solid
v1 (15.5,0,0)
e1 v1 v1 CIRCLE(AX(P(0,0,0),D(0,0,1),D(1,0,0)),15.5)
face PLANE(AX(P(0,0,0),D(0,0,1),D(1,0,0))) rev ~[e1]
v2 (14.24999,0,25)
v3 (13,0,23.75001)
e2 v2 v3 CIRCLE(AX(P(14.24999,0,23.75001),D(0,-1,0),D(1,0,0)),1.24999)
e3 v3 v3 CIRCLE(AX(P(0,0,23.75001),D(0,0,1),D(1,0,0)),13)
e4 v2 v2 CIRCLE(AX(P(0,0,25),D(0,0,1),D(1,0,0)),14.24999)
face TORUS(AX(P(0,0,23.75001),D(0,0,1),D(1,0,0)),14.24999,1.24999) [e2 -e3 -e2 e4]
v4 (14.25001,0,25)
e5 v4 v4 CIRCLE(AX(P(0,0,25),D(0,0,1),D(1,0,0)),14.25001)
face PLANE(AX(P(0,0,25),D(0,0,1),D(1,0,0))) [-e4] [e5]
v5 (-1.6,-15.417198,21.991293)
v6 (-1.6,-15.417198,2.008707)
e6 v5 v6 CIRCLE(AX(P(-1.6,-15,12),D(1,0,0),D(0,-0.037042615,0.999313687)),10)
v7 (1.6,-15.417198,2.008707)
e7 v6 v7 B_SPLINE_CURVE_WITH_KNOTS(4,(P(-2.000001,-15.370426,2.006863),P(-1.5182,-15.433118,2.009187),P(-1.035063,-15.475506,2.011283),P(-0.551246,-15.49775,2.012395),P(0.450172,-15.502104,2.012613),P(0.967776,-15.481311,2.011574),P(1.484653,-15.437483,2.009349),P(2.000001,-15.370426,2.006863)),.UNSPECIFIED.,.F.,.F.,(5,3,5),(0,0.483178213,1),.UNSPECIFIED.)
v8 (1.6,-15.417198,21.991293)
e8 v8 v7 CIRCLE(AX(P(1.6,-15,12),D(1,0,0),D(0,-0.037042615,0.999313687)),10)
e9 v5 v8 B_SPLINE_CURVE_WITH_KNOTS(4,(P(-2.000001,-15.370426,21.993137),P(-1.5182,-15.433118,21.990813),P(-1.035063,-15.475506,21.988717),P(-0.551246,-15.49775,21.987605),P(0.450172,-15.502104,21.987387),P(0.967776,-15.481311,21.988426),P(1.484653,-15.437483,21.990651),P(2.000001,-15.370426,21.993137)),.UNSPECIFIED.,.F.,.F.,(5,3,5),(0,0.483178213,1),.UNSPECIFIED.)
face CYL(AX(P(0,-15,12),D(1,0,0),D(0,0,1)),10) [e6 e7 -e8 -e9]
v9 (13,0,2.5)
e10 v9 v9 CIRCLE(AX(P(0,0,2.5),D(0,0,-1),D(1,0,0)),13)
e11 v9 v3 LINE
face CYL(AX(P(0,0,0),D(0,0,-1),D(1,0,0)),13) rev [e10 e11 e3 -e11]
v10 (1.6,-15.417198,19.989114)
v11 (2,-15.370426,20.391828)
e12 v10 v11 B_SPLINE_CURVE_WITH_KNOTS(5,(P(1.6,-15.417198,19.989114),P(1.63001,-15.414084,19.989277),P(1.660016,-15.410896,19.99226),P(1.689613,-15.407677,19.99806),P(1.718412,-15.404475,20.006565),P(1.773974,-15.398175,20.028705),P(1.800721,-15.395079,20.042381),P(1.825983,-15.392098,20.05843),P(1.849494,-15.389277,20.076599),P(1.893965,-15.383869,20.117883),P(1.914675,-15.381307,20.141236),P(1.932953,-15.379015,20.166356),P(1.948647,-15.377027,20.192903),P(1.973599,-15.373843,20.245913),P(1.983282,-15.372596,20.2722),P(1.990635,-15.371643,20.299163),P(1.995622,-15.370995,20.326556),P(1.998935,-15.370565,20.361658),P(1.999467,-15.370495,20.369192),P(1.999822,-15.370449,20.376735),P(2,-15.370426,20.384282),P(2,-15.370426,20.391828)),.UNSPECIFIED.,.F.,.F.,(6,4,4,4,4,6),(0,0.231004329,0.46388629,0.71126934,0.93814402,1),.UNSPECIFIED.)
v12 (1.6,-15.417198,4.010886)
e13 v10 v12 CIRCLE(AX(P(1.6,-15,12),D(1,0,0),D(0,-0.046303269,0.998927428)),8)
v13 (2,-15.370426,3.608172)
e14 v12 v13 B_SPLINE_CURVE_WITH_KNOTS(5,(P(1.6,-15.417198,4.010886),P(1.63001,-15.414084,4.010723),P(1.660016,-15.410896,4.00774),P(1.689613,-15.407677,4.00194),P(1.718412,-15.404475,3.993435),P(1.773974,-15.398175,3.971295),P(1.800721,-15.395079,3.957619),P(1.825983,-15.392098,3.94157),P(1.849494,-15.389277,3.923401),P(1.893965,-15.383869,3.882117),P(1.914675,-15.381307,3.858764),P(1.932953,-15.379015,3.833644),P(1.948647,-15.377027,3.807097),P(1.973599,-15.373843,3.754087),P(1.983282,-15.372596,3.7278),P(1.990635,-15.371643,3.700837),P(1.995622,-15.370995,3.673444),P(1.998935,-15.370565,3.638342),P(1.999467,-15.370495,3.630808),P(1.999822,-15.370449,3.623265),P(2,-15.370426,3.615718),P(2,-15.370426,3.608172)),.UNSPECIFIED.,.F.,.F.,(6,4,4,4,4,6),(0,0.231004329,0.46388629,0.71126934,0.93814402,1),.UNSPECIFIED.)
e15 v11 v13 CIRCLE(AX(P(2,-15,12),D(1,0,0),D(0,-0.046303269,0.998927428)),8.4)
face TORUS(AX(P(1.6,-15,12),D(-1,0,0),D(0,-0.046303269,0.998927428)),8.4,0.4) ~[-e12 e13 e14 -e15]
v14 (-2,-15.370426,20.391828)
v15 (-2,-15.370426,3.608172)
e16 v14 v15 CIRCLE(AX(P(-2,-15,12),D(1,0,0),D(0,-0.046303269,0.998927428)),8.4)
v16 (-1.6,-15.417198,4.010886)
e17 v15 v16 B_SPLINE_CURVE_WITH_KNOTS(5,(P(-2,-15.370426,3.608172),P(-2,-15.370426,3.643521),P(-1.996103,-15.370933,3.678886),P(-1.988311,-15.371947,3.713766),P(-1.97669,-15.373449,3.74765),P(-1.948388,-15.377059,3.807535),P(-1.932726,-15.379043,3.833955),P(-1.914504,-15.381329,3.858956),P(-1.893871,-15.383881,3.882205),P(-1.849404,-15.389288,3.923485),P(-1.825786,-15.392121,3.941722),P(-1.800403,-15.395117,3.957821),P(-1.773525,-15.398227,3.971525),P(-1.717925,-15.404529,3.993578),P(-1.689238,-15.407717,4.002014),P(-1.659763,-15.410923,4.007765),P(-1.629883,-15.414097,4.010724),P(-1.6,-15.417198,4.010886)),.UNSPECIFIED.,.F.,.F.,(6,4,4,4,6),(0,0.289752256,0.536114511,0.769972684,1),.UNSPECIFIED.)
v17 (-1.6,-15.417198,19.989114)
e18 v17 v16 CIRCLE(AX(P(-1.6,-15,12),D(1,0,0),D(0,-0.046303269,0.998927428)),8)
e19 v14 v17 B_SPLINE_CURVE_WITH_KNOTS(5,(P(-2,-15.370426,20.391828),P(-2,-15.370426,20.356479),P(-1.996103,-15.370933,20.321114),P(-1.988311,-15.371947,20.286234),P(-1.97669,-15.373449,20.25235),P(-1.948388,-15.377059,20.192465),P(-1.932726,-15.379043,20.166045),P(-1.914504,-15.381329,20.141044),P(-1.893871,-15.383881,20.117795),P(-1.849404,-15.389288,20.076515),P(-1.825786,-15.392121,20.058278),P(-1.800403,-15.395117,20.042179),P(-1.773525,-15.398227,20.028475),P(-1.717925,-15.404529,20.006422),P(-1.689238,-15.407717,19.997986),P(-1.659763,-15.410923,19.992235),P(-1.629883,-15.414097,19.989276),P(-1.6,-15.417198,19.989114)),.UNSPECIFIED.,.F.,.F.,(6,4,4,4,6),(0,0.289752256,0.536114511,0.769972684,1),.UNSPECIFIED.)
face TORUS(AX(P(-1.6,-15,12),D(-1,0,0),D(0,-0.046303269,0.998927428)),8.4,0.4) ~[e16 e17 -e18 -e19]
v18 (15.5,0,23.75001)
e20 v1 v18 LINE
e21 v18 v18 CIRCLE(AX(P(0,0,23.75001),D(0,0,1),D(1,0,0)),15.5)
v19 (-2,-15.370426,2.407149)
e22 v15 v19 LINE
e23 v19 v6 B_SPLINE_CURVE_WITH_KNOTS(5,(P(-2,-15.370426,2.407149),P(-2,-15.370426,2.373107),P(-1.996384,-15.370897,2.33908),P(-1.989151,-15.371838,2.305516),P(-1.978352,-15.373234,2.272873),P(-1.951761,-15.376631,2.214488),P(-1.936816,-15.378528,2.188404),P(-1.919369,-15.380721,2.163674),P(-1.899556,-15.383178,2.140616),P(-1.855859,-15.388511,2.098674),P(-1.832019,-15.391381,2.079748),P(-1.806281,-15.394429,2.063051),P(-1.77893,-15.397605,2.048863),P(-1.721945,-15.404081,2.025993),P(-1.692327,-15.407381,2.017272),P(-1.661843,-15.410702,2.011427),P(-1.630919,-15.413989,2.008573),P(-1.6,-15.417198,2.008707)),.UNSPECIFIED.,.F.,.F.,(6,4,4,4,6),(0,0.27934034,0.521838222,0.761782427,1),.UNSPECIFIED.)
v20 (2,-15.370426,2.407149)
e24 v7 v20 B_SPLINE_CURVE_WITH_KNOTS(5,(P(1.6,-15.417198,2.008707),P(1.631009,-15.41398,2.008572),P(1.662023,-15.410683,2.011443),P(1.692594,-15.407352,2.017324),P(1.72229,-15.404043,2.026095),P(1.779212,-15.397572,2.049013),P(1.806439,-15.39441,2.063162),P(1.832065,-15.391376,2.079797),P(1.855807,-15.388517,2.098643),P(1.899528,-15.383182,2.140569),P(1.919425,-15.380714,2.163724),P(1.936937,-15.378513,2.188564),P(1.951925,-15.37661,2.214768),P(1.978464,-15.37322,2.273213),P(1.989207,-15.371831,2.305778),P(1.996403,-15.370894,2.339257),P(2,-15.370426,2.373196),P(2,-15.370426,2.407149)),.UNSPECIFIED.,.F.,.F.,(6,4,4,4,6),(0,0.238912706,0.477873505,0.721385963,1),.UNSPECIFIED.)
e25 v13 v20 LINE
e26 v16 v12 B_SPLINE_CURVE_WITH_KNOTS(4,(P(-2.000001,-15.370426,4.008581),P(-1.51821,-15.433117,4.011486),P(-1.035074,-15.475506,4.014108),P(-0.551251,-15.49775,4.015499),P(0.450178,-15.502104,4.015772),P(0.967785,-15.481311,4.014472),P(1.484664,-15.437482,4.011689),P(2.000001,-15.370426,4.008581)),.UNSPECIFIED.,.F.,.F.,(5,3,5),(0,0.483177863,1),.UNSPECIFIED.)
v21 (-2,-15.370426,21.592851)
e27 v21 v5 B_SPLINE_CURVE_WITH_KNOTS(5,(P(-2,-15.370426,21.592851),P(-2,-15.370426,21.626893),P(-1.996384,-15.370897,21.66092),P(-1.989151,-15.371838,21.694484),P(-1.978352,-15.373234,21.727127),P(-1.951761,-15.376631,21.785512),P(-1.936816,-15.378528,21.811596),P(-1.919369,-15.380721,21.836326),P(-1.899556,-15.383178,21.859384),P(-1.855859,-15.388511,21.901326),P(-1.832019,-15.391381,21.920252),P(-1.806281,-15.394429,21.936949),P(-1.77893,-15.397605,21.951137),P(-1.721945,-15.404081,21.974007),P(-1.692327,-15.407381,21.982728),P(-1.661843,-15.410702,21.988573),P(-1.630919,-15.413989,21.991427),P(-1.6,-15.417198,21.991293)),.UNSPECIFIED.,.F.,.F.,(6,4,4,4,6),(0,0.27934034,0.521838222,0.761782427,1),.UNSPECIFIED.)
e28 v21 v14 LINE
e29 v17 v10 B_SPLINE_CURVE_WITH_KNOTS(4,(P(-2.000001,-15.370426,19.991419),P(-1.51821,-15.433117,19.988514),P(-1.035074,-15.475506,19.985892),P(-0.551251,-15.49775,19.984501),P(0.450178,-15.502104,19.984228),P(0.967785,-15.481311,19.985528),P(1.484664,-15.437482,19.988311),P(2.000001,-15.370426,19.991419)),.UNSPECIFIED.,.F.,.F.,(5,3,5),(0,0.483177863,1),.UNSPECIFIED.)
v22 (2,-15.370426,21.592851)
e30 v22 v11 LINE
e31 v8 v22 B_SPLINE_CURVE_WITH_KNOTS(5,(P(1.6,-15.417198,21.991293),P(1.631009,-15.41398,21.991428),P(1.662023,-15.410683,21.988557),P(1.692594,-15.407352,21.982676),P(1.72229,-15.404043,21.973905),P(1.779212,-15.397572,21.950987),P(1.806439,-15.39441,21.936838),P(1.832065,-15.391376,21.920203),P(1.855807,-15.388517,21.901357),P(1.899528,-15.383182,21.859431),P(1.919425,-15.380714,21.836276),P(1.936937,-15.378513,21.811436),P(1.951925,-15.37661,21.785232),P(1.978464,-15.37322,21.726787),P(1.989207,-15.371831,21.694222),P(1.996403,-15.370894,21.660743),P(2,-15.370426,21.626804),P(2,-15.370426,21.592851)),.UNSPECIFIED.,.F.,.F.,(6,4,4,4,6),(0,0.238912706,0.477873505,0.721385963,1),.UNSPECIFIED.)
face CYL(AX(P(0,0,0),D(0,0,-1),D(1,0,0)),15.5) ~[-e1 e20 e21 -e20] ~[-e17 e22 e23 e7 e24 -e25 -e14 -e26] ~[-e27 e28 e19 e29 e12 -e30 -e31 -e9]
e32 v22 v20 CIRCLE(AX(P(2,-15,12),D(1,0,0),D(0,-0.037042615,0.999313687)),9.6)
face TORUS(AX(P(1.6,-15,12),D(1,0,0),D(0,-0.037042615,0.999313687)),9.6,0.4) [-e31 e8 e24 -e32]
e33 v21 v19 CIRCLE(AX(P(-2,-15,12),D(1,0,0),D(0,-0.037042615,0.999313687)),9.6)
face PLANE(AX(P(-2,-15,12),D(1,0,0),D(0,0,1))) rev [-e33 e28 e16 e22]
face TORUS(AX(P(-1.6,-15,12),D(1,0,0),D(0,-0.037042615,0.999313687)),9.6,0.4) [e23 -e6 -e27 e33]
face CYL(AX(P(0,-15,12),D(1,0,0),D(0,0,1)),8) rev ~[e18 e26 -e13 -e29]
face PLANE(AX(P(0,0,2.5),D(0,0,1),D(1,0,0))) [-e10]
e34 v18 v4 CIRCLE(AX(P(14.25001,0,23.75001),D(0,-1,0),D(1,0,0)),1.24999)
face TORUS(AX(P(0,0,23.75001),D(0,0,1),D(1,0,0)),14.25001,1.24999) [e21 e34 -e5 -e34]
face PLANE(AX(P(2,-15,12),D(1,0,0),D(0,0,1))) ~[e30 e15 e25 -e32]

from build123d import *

# Parameters (mm, degrees)
F0_R     = 15.5
F1_DEPTH = 25
F2_T     = -2.5
F3_R     = 1.24999
F5_W     = 4
F5_H     = 2
F6_ANGLE = 180
F7_R     = 0.4


# Not quite as in the source:
# - a fillet or chamfer is up to 0.001 mm smaller than in the source, because OpenCascade refuses the exact size


with BuildPart() as f1:
    # F0 (on Top) → F1 (new body)
    with BuildSketch(Plane.XY):
        Circle(F0_R)
    extrude(amount=F1_DEPTH)

    # F2
    f2_openings = [f1.faces().sort_by_distance(p)[0] for p in [
        (0, 0, 25),
    ]]
    offset(amount=F2_T, openings=f2_openings)

    # F3 (radius 1.25 in the source; OpenCascade refuses exactly that, so slightly less here)
    f3_edges = [f1.edges().sort_by_distance(p)[0] for p in [
        (-15.5, 0, 25),
        (-13, 0, 25),
    ]]
    fillet(f3_edges, radius=F3_R)

    # F5 (on offset) → F6 (revolve)
    with BuildSketch(Plane.XZ.offset(15)):
        with Locations((0, 21)):
            Rectangle(F5_W, F5_H)
    revolve(axis=Axis((1, -15, 12), (1, 0, 0)), revolution_arc=F6_ANGLE)

    # F7
    f7_edges = [f1.edges().sort_by_distance(p)[0] for p in [
        (2, -25, 12),
        (-2, -25, 12),
        (2, -23, 12),
        (-2, -23, 12),
    ]]
    fillet(f7_edges, radius=F7_R)


solid = f1.part
